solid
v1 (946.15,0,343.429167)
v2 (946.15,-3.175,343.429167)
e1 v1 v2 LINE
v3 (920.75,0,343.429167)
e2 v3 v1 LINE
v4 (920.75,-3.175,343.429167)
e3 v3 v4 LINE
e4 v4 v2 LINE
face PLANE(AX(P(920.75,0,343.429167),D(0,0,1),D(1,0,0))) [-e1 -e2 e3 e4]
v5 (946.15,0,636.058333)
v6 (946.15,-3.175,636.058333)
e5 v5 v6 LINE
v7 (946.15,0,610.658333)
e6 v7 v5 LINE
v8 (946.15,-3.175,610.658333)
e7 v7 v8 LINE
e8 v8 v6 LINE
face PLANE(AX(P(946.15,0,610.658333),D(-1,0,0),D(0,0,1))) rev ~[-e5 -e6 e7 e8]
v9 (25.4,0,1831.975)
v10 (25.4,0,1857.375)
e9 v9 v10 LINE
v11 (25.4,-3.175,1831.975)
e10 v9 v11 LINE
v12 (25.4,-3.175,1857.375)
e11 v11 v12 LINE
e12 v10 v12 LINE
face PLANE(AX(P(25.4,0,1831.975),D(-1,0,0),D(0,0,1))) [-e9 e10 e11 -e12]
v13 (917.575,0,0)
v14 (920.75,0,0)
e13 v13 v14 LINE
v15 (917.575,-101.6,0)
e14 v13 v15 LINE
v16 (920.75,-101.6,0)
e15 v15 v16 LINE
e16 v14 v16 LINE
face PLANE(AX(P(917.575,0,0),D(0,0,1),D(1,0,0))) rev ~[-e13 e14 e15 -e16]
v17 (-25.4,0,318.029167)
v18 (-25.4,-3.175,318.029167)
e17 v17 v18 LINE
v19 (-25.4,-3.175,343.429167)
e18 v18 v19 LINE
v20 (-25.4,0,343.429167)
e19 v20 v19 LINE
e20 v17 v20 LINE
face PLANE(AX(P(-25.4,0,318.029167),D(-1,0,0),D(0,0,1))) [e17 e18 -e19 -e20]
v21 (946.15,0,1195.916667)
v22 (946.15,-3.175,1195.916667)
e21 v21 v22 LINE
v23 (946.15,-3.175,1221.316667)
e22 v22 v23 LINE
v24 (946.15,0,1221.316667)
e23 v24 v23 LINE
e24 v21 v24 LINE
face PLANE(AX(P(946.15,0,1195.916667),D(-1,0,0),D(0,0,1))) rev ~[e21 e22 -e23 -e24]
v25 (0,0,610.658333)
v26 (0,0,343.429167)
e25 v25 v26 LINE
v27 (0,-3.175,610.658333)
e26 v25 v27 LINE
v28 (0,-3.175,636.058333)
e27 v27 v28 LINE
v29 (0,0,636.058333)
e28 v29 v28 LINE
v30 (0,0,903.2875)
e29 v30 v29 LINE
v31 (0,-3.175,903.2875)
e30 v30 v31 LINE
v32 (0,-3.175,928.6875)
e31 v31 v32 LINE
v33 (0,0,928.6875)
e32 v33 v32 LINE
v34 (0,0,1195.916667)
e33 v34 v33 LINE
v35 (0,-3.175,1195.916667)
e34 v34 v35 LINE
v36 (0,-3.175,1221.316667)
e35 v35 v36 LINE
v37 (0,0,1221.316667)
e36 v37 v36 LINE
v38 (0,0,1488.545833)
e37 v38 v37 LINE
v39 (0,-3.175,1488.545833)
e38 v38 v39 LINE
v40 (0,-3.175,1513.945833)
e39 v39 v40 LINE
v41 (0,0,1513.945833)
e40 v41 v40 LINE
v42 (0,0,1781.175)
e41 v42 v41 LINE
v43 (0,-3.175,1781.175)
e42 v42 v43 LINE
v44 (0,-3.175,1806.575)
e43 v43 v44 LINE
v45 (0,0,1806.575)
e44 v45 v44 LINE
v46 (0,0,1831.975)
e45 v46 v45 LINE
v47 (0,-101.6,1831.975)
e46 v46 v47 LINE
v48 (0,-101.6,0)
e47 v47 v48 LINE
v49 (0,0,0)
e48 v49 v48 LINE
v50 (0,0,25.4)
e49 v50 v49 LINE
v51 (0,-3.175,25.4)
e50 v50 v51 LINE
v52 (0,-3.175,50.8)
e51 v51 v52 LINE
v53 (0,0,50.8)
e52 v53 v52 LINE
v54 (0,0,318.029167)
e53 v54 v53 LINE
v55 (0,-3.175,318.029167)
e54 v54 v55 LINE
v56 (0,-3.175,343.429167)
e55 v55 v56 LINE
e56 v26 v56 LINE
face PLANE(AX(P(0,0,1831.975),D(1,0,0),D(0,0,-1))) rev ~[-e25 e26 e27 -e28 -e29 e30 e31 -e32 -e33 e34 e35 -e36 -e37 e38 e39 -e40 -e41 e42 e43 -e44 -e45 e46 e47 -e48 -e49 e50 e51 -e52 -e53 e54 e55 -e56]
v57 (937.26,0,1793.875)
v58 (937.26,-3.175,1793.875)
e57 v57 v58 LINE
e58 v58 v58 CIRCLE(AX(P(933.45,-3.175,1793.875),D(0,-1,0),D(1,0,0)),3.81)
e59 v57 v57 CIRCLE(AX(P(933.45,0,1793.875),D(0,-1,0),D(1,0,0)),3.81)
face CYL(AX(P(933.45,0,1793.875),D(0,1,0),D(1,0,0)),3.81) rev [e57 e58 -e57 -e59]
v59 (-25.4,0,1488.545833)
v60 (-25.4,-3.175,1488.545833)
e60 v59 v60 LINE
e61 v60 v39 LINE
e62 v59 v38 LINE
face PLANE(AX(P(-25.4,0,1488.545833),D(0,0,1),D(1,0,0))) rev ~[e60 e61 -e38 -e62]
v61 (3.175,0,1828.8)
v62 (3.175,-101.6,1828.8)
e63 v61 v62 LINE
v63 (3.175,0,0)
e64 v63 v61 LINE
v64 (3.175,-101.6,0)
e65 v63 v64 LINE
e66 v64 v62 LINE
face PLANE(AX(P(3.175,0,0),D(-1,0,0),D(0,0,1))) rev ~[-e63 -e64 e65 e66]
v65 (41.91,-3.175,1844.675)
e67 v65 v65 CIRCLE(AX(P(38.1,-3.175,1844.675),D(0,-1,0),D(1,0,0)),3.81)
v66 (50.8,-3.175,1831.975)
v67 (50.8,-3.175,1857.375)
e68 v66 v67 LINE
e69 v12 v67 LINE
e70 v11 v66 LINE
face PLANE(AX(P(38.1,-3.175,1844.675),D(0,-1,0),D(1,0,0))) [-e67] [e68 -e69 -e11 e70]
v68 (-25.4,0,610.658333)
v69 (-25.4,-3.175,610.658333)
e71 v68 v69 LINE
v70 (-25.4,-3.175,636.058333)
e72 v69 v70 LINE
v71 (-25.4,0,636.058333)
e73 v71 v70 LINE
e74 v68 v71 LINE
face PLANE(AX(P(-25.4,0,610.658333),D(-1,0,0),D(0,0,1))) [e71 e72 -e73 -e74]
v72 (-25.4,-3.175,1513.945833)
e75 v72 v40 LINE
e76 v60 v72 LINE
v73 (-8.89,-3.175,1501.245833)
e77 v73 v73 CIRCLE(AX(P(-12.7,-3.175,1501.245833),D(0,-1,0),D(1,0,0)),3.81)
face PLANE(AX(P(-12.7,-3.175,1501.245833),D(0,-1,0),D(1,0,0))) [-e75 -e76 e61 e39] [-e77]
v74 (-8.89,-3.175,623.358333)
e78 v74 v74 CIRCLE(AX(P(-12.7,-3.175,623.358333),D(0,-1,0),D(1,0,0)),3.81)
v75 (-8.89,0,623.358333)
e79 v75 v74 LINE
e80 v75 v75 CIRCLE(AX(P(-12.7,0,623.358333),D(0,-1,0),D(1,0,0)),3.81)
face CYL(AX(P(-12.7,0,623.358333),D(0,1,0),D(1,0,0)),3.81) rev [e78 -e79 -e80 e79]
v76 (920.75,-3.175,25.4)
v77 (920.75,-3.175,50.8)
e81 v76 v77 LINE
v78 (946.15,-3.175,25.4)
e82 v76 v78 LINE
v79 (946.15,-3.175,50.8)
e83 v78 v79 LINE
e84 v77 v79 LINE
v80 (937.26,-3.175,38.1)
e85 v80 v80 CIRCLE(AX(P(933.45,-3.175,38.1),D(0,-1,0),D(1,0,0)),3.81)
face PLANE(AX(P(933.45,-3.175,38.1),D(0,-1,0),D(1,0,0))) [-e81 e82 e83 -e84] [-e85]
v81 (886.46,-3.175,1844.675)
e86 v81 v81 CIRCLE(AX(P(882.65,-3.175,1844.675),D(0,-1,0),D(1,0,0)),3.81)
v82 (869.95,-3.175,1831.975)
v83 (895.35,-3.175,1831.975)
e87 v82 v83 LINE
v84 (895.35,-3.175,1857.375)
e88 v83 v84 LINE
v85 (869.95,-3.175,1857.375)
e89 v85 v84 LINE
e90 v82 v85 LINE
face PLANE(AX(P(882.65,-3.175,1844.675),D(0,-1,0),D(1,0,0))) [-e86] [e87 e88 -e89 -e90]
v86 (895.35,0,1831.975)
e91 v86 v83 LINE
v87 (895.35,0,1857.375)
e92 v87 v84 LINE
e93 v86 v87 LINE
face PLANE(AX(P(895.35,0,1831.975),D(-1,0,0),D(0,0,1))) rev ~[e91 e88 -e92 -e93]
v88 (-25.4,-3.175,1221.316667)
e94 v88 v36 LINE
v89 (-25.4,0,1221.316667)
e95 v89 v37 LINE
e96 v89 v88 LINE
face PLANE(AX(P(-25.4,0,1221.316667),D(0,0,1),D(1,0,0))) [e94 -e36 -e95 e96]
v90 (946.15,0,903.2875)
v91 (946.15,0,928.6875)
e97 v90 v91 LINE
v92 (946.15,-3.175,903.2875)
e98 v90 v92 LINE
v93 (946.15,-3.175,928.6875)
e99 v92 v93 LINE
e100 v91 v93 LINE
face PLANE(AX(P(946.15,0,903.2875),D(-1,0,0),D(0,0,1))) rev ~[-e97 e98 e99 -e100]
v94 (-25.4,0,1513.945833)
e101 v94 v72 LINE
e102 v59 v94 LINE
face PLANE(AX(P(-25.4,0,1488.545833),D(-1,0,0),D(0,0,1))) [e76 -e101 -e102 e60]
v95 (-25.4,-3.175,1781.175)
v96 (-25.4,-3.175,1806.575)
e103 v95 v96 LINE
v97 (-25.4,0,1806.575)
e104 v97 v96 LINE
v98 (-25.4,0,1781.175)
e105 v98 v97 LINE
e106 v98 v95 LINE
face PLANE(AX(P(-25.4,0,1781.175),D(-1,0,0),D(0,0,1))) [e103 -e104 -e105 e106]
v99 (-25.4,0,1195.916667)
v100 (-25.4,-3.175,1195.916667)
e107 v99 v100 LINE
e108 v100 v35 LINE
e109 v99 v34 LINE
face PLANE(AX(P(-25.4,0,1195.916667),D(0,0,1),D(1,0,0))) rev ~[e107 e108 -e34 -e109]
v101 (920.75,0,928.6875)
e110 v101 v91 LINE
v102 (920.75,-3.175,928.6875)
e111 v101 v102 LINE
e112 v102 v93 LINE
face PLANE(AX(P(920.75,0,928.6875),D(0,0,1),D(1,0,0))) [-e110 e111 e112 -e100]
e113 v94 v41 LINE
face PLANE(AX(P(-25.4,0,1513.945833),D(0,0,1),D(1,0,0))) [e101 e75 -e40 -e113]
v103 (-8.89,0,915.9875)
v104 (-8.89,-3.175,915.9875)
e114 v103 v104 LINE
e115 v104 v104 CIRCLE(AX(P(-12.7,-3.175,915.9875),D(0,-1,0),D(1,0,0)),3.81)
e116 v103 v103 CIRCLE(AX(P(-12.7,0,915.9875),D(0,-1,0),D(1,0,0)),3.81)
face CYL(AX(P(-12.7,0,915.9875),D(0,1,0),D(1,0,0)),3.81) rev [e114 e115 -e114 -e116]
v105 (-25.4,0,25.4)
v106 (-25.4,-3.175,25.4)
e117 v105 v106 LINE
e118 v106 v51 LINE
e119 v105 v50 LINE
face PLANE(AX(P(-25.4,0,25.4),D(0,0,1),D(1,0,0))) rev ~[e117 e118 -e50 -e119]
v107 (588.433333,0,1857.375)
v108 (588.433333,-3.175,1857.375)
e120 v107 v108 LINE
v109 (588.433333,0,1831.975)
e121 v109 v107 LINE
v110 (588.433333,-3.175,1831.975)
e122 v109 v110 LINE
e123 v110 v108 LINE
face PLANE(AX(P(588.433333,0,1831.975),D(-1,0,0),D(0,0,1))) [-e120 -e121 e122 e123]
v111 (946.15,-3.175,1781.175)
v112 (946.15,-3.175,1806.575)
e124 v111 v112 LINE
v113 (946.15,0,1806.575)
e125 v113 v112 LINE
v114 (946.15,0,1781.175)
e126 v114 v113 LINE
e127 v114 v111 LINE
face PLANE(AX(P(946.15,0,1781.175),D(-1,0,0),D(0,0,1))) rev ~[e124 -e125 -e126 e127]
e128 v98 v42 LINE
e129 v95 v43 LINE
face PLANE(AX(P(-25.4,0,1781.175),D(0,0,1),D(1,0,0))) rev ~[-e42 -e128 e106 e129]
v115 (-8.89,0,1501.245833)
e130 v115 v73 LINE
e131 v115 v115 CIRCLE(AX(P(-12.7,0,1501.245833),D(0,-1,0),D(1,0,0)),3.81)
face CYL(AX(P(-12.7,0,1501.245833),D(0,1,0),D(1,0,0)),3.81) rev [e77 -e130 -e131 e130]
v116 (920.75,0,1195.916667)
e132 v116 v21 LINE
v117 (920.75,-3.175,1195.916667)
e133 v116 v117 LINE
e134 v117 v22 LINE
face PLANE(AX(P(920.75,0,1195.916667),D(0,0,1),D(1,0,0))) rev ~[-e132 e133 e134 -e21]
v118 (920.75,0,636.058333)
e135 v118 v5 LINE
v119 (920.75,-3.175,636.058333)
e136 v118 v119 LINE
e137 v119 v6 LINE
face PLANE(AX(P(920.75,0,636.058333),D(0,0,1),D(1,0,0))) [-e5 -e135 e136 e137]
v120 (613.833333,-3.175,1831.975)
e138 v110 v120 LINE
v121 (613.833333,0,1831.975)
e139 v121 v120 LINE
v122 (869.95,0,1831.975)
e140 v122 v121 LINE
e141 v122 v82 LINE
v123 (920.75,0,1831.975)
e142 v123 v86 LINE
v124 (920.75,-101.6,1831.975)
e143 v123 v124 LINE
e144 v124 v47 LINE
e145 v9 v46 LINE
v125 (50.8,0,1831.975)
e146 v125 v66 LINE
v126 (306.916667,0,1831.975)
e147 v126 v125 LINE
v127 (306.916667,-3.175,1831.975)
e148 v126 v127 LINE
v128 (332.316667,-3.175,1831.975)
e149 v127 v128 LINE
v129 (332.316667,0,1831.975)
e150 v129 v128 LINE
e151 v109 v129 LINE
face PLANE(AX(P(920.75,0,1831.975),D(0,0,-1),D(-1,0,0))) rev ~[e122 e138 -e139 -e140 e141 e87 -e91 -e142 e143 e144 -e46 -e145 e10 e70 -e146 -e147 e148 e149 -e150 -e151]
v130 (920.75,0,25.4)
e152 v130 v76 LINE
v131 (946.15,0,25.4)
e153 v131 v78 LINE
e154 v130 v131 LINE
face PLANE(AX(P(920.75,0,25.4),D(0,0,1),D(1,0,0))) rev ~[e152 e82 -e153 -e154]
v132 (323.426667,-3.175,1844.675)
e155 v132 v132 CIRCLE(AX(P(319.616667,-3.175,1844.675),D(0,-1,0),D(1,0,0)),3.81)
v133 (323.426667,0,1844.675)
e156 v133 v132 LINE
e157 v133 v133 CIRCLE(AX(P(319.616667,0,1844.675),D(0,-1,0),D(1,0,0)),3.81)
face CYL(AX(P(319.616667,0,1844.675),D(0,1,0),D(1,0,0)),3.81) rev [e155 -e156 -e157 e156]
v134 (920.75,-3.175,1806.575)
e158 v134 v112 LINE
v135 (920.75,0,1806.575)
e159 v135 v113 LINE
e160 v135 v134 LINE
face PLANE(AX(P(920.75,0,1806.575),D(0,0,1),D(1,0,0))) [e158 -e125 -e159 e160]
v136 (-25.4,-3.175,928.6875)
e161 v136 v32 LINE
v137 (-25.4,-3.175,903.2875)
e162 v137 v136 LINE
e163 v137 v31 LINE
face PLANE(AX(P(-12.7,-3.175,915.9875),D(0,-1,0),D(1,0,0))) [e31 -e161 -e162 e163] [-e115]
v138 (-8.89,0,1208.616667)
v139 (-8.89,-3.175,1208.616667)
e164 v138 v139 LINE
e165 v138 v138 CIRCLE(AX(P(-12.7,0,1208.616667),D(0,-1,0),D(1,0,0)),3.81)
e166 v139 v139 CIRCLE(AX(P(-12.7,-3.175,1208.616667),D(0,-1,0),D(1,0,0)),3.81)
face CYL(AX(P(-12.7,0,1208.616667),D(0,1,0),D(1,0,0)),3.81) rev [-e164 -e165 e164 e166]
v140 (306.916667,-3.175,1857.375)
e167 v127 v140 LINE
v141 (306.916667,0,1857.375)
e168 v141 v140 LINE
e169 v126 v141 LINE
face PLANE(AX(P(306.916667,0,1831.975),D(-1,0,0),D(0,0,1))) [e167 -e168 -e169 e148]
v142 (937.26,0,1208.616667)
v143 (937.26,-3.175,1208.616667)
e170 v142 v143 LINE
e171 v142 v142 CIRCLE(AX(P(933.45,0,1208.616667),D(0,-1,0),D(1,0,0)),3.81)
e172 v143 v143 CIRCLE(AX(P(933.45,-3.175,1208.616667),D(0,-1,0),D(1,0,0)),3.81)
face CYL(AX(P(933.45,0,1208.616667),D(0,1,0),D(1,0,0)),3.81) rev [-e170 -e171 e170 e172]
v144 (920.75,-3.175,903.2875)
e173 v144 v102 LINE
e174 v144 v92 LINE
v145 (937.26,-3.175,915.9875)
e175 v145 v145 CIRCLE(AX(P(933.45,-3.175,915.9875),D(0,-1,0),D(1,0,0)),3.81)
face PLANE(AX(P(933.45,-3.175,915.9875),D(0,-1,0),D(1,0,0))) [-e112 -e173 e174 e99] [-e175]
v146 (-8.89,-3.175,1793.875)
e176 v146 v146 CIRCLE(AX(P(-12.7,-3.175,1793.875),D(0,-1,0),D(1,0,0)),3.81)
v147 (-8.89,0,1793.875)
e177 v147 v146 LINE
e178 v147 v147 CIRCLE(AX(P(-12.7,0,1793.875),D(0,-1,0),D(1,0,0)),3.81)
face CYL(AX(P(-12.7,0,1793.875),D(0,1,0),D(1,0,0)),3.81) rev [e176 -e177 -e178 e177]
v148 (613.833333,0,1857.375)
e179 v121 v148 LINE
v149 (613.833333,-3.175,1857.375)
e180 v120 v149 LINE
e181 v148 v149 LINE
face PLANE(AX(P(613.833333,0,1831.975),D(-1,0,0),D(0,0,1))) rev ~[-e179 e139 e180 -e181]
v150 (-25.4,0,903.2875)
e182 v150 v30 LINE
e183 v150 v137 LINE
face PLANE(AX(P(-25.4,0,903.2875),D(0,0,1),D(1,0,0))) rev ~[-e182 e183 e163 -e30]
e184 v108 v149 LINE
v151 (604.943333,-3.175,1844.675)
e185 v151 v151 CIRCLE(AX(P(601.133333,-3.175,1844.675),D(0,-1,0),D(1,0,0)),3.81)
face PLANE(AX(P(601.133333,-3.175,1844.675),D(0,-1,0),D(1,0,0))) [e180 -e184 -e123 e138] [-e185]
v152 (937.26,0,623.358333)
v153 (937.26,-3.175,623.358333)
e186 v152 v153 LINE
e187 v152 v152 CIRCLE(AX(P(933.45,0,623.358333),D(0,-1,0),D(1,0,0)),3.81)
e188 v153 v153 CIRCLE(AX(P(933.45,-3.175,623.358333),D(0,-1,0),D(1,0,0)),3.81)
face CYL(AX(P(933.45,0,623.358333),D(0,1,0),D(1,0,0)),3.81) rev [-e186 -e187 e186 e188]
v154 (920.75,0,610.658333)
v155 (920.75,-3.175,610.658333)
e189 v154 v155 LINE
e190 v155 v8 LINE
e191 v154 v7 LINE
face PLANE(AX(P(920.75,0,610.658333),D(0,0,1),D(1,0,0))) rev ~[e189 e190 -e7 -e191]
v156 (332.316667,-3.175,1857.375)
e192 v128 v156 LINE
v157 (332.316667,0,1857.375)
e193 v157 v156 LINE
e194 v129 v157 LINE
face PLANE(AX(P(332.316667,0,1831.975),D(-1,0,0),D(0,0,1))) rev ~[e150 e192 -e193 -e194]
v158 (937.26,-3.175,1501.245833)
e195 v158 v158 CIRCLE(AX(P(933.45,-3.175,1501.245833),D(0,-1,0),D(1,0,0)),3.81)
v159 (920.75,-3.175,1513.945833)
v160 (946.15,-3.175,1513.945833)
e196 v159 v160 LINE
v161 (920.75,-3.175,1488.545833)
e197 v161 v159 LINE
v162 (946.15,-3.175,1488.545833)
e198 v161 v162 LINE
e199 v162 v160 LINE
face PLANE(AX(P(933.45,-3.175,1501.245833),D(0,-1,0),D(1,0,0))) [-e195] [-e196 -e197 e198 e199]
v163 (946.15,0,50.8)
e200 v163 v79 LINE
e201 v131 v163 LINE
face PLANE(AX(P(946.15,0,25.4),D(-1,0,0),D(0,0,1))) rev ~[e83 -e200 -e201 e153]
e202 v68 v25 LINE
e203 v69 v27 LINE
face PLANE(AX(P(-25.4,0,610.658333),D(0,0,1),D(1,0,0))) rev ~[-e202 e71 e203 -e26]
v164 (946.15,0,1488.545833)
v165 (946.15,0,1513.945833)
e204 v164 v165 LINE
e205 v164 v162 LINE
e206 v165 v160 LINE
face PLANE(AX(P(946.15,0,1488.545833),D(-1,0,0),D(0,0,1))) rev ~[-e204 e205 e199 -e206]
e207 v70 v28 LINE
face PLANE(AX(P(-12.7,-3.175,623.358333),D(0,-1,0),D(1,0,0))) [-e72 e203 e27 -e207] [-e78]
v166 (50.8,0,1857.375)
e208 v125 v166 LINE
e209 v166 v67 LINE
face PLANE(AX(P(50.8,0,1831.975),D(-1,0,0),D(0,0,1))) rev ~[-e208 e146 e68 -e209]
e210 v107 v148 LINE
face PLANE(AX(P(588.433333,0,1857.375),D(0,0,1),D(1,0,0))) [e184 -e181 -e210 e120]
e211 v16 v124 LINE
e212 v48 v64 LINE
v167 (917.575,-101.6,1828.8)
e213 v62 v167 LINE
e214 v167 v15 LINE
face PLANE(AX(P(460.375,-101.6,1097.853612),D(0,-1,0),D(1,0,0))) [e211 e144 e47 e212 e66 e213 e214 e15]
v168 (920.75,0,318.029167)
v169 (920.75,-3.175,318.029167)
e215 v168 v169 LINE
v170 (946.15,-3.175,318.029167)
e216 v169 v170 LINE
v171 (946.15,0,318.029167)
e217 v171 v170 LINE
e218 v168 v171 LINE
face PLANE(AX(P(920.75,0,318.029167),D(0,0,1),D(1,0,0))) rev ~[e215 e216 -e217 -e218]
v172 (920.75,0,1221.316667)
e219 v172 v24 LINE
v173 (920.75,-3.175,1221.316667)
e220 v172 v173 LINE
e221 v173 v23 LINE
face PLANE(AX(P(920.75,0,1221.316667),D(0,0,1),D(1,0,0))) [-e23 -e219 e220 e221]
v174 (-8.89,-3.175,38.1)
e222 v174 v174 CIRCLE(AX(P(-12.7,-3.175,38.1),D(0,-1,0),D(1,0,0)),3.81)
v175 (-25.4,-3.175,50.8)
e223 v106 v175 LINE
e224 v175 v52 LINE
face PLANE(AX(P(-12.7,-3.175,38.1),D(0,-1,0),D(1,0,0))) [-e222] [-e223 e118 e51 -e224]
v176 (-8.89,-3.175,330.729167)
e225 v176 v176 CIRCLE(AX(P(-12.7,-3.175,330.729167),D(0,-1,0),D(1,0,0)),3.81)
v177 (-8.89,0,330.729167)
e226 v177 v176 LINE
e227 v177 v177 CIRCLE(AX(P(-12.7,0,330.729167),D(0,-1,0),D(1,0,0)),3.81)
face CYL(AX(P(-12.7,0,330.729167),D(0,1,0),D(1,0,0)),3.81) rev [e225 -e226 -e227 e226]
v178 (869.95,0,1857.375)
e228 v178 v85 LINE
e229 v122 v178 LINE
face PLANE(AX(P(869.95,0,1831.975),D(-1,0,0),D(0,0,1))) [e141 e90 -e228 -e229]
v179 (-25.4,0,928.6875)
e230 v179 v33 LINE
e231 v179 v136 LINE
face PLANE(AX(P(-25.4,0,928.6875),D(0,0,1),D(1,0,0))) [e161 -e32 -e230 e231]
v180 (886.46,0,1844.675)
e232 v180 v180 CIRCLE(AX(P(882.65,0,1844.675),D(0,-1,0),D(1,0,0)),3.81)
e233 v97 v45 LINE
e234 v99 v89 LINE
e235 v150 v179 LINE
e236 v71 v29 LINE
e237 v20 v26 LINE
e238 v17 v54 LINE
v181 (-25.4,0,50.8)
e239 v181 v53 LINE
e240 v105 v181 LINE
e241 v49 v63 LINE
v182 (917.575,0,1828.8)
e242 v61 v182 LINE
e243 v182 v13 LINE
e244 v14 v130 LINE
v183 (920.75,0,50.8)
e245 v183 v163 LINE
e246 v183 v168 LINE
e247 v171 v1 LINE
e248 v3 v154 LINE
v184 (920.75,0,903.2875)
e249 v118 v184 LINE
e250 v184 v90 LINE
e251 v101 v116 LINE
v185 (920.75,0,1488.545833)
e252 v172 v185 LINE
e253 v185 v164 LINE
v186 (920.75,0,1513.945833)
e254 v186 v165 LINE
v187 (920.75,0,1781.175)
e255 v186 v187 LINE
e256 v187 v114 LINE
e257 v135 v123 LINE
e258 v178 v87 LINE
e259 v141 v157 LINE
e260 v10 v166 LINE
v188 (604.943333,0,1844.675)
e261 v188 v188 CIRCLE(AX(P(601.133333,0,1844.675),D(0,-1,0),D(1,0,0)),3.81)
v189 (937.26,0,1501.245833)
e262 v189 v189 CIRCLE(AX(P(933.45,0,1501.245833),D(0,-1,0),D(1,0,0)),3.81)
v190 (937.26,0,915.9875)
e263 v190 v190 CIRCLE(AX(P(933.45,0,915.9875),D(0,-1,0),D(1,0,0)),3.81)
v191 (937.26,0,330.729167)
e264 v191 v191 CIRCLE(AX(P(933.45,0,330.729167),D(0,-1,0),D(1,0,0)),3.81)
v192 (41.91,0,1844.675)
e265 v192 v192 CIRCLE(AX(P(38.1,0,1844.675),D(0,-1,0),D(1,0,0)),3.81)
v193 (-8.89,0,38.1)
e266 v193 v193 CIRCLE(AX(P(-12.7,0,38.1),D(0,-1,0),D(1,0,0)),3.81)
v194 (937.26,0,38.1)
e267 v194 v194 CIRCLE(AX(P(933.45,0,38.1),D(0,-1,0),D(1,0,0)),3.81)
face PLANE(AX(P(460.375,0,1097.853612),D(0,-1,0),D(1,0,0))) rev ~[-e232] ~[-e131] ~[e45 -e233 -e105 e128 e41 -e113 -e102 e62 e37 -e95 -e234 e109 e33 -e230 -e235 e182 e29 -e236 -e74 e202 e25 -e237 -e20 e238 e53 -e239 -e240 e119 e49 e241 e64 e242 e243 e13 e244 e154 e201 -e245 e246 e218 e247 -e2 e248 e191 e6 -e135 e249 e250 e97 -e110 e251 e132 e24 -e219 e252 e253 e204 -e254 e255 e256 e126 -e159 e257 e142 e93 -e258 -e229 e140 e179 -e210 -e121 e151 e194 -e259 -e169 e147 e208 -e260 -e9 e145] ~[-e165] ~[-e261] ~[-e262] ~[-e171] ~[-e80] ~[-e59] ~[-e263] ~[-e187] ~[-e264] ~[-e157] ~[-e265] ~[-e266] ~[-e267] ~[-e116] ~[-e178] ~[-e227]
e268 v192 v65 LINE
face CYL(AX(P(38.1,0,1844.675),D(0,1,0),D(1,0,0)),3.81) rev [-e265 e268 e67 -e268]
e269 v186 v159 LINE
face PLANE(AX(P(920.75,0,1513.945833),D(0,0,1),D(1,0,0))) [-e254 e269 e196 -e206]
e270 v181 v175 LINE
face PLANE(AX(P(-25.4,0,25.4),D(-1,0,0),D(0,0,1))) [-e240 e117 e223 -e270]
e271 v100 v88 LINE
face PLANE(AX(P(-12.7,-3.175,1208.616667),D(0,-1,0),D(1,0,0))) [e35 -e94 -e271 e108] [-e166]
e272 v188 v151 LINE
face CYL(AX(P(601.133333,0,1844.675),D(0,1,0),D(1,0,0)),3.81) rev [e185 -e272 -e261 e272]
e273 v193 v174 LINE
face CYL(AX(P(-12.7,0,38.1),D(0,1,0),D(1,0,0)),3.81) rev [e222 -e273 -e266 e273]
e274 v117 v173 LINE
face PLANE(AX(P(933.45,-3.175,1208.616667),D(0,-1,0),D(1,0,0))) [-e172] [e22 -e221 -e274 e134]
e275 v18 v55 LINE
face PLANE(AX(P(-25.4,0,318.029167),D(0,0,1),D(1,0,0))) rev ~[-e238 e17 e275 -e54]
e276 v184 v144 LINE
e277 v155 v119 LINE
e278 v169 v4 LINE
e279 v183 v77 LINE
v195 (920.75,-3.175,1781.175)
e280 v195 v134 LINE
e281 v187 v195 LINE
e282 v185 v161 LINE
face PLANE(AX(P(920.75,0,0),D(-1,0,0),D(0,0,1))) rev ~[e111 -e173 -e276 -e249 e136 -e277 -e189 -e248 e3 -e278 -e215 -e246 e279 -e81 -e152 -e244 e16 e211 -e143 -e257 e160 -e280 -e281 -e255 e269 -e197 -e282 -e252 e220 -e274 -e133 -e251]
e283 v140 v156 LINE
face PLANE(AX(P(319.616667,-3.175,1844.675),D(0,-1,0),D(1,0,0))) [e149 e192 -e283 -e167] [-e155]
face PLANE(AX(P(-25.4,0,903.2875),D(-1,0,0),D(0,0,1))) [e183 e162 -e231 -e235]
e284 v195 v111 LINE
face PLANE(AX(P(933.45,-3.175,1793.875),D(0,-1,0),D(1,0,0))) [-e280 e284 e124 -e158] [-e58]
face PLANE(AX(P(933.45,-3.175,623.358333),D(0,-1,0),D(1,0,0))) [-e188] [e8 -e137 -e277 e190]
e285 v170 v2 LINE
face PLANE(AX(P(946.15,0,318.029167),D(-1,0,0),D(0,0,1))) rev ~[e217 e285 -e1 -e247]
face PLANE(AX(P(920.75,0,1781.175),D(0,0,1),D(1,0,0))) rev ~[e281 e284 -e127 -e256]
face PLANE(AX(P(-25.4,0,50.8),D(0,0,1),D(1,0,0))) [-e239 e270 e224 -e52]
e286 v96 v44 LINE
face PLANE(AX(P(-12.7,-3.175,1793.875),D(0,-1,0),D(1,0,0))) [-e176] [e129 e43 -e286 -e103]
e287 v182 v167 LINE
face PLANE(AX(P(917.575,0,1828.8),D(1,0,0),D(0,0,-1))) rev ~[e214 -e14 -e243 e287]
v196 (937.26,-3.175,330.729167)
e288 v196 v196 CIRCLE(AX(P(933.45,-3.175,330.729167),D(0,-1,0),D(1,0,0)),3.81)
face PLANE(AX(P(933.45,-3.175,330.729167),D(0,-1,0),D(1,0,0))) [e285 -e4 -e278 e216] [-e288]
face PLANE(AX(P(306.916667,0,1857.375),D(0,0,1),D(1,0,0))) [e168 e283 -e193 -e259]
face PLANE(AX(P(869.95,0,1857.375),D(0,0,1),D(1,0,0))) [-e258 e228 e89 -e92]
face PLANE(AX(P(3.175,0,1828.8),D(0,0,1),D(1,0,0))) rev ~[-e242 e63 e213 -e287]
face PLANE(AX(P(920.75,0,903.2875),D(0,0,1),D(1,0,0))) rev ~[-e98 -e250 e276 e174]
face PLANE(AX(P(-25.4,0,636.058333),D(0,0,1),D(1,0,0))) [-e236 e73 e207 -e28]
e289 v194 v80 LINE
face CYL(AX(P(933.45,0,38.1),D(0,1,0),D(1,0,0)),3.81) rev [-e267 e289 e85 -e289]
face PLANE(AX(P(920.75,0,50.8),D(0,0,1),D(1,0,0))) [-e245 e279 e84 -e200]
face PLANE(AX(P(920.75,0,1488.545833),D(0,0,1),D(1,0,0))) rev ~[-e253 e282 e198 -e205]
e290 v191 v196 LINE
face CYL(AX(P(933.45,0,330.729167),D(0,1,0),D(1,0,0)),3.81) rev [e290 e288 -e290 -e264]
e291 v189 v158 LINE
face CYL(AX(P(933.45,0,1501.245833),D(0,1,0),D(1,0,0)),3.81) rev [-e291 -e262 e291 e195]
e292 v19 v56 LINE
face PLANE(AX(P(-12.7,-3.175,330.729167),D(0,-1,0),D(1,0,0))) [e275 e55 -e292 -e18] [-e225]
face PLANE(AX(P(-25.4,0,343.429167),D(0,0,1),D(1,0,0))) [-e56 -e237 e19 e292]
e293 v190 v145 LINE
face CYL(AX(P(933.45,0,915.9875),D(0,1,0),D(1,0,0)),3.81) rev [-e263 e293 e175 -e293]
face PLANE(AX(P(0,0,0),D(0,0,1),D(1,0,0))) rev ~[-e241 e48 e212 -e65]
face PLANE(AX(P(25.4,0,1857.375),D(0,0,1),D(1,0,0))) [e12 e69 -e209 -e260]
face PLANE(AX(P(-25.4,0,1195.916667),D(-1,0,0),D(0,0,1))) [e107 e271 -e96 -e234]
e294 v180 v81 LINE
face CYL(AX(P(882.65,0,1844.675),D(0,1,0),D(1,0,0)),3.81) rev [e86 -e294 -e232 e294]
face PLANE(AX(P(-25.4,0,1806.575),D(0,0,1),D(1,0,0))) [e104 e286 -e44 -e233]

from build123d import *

# Parameters (mm, degrees)
F1_DEPTH = 101.6
F0_W     = 25.4
F0_H     = 25.4
F0_R     = 3.81
F2_DEPTH = 3.175


# Not quite as in the source:
# - a feature names something its author has since deleted; it is built from what else it names


with BuildPart() as f1:
    # F0 (on Front) → F1 (new body)
    with BuildSketch(Plane.XZ):
        Polygon((0, 25.4), (0, 0), (3.175, 0), (3.175, 1828.8), (917.575, 1828.8), (917.575, 0), (920.75, 0), (920.75, 25.4), (920.75, 50.8), (920.75, 318.0291666667), (920.75, 343.4291666667), (920.75, 610.6583333333), (920.75, 636.0583333333), (920.75, 903.2875), (920.75, 928.6875), (920.75, 1195.9166666667), (920.75, 1221.3166666667), (920.75, 1488.5458333333), (920.75, 1513.9458333333), (920.75, 1781.175), (920.75, 1806.575), (920.75, 1831.975), (895.35, 1831.975), (869.95, 1831.975), (613.8333333333, 1831.975), (588.4333333333, 1831.975), (332.3166666667, 1831.975), (306.9166666667, 1831.975), (50.8, 1831.975), (25.4, 1831.975), (0, 1831.975), (0, 1806.575), (0, 1781.175), (0, 1513.9458333333), (0, 1488.5458333333), (0, 1221.3166666667), (0, 1195.9166666667), (0, 928.6875), (0, 903.2875), (0, 636.0583333333), (0, 610.6583333333), (0, 343.4291666667), (0, 318.0291666667), (0, 50.8), align=None)
    extrude(amount=F1_DEPTH)

    # F0 (on Front) → F2 (join)
    with BuildSketch(Plane.XZ):
        with Locations((-12.7, 38.1)):
            Rectangle(F0_W, F0_H)
        with Locations((-12.7, 38.1)):
            Circle(F0_R, mode=Mode.SUBTRACT)
        with Locations((-12.7, 330.7291666667)):
            Rectangle(F0_W, F0_H)
        with Locations((-12.7, 330.7291666667)):
            Circle(F0_R, mode=Mode.SUBTRACT)
        with Locations((-12.7, 623.3583333333)):
            Rectangle(F0_W, F0_H)
        with Locations((-12.7, 623.3583333333)):
            Circle(F0_R, mode=Mode.SUBTRACT)
        with Locations((933.45, 38.1)):
            Rectangle(F0_W, F0_H)
        with Locations((933.45, 38.1)):
            Circle(F0_R, mode=Mode.SUBTRACT)
        with Locations((-12.7, 915.9875)):
            Rectangle(F0_W, F0_H)
        with Locations((-12.7, 915.9875)):
            Circle(F0_R, mode=Mode.SUBTRACT)
        with Locations((933.45, 330.7291666667)):
            Rectangle(F0_W, F0_H)
        with Locations((933.45, 330.7291666667)):
            Circle(F0_R, mode=Mode.SUBTRACT)
        with Locations((-12.7, 1208.6166666667)):
            Rectangle(F0_W, F0_H)
        with Locations((-12.7, 1208.6166666667)):
            Circle(F0_R, mode=Mode.SUBTRACT)
        with Locations((933.45, 623.3583333333)):
            Rectangle(F0_W, F0_H)
        with Locations((933.45, 623.3583333333)):
            Circle(F0_R, mode=Mode.SUBTRACT)
        with Locations((-12.7, 1501.2458333333)):
            Rectangle(F0_W, F0_H)
        with Locations((-12.7, 1501.2458333333)):
            Circle(F0_R, mode=Mode.SUBTRACT)
        with Locations((933.45, 915.9875)):
            Rectangle(F0_W, F0_H)
        with Locations((933.45, 915.9875)):
            Circle(F0_R, mode=Mode.SUBTRACT)
        with Locations((-12.7, 1793.875)):
            Rectangle(F0_W, F0_H)
        with Locations((-12.7, 1793.875)):
            Circle(F0_R, mode=Mode.SUBTRACT)
        with Locations((933.45, 1208.6166666667)):
            Rectangle(F0_W, F0_H)
        with Locations((933.45, 1208.6166666667)):
            Circle(F0_R, mode=Mode.SUBTRACT)
        with Locations((38.1, 1844.675)):
            Rectangle(F0_W, F0_H)
        with Locations((38.1, 1844.675)):
            Circle(F0_R, mode=Mode.SUBTRACT)
        with Locations((933.45, 1501.2458333333)):
            Rectangle(F0_W, F0_H)
        with Locations((933.45, 1501.2458333333)):
            Circle(F0_R, mode=Mode.SUBTRACT)
        with Locations((319.6166666667, 1844.675)):
            Rectangle(F0_W, F0_H)
        with Locations((319.6166666667, 1844.675)):
            Circle(F0_R, mode=Mode.SUBTRACT)
        with Locations((933.45, 1793.875)):
            Rectangle(F0_W, F0_H)
        with Locations((933.45, 1793.875)):
            Circle(F0_R, mode=Mode.SUBTRACT)
        with Locations((601.1333333333, 1844.675)):
            Rectangle(F0_W, F0_H)
        with Locations((601.1333333333, 1844.675)):
            Circle(F0_R, mode=Mode.SUBTRACT)
        with Locations((882.65, 1844.675)):
            Rectangle(F0_W, F0_H)
        with Locations((882.65, 1844.675)):
            Circle(F0_R, mode=Mode.SUBTRACT)
    extrude(amount=F2_DEPTH)


solid = f1.part
